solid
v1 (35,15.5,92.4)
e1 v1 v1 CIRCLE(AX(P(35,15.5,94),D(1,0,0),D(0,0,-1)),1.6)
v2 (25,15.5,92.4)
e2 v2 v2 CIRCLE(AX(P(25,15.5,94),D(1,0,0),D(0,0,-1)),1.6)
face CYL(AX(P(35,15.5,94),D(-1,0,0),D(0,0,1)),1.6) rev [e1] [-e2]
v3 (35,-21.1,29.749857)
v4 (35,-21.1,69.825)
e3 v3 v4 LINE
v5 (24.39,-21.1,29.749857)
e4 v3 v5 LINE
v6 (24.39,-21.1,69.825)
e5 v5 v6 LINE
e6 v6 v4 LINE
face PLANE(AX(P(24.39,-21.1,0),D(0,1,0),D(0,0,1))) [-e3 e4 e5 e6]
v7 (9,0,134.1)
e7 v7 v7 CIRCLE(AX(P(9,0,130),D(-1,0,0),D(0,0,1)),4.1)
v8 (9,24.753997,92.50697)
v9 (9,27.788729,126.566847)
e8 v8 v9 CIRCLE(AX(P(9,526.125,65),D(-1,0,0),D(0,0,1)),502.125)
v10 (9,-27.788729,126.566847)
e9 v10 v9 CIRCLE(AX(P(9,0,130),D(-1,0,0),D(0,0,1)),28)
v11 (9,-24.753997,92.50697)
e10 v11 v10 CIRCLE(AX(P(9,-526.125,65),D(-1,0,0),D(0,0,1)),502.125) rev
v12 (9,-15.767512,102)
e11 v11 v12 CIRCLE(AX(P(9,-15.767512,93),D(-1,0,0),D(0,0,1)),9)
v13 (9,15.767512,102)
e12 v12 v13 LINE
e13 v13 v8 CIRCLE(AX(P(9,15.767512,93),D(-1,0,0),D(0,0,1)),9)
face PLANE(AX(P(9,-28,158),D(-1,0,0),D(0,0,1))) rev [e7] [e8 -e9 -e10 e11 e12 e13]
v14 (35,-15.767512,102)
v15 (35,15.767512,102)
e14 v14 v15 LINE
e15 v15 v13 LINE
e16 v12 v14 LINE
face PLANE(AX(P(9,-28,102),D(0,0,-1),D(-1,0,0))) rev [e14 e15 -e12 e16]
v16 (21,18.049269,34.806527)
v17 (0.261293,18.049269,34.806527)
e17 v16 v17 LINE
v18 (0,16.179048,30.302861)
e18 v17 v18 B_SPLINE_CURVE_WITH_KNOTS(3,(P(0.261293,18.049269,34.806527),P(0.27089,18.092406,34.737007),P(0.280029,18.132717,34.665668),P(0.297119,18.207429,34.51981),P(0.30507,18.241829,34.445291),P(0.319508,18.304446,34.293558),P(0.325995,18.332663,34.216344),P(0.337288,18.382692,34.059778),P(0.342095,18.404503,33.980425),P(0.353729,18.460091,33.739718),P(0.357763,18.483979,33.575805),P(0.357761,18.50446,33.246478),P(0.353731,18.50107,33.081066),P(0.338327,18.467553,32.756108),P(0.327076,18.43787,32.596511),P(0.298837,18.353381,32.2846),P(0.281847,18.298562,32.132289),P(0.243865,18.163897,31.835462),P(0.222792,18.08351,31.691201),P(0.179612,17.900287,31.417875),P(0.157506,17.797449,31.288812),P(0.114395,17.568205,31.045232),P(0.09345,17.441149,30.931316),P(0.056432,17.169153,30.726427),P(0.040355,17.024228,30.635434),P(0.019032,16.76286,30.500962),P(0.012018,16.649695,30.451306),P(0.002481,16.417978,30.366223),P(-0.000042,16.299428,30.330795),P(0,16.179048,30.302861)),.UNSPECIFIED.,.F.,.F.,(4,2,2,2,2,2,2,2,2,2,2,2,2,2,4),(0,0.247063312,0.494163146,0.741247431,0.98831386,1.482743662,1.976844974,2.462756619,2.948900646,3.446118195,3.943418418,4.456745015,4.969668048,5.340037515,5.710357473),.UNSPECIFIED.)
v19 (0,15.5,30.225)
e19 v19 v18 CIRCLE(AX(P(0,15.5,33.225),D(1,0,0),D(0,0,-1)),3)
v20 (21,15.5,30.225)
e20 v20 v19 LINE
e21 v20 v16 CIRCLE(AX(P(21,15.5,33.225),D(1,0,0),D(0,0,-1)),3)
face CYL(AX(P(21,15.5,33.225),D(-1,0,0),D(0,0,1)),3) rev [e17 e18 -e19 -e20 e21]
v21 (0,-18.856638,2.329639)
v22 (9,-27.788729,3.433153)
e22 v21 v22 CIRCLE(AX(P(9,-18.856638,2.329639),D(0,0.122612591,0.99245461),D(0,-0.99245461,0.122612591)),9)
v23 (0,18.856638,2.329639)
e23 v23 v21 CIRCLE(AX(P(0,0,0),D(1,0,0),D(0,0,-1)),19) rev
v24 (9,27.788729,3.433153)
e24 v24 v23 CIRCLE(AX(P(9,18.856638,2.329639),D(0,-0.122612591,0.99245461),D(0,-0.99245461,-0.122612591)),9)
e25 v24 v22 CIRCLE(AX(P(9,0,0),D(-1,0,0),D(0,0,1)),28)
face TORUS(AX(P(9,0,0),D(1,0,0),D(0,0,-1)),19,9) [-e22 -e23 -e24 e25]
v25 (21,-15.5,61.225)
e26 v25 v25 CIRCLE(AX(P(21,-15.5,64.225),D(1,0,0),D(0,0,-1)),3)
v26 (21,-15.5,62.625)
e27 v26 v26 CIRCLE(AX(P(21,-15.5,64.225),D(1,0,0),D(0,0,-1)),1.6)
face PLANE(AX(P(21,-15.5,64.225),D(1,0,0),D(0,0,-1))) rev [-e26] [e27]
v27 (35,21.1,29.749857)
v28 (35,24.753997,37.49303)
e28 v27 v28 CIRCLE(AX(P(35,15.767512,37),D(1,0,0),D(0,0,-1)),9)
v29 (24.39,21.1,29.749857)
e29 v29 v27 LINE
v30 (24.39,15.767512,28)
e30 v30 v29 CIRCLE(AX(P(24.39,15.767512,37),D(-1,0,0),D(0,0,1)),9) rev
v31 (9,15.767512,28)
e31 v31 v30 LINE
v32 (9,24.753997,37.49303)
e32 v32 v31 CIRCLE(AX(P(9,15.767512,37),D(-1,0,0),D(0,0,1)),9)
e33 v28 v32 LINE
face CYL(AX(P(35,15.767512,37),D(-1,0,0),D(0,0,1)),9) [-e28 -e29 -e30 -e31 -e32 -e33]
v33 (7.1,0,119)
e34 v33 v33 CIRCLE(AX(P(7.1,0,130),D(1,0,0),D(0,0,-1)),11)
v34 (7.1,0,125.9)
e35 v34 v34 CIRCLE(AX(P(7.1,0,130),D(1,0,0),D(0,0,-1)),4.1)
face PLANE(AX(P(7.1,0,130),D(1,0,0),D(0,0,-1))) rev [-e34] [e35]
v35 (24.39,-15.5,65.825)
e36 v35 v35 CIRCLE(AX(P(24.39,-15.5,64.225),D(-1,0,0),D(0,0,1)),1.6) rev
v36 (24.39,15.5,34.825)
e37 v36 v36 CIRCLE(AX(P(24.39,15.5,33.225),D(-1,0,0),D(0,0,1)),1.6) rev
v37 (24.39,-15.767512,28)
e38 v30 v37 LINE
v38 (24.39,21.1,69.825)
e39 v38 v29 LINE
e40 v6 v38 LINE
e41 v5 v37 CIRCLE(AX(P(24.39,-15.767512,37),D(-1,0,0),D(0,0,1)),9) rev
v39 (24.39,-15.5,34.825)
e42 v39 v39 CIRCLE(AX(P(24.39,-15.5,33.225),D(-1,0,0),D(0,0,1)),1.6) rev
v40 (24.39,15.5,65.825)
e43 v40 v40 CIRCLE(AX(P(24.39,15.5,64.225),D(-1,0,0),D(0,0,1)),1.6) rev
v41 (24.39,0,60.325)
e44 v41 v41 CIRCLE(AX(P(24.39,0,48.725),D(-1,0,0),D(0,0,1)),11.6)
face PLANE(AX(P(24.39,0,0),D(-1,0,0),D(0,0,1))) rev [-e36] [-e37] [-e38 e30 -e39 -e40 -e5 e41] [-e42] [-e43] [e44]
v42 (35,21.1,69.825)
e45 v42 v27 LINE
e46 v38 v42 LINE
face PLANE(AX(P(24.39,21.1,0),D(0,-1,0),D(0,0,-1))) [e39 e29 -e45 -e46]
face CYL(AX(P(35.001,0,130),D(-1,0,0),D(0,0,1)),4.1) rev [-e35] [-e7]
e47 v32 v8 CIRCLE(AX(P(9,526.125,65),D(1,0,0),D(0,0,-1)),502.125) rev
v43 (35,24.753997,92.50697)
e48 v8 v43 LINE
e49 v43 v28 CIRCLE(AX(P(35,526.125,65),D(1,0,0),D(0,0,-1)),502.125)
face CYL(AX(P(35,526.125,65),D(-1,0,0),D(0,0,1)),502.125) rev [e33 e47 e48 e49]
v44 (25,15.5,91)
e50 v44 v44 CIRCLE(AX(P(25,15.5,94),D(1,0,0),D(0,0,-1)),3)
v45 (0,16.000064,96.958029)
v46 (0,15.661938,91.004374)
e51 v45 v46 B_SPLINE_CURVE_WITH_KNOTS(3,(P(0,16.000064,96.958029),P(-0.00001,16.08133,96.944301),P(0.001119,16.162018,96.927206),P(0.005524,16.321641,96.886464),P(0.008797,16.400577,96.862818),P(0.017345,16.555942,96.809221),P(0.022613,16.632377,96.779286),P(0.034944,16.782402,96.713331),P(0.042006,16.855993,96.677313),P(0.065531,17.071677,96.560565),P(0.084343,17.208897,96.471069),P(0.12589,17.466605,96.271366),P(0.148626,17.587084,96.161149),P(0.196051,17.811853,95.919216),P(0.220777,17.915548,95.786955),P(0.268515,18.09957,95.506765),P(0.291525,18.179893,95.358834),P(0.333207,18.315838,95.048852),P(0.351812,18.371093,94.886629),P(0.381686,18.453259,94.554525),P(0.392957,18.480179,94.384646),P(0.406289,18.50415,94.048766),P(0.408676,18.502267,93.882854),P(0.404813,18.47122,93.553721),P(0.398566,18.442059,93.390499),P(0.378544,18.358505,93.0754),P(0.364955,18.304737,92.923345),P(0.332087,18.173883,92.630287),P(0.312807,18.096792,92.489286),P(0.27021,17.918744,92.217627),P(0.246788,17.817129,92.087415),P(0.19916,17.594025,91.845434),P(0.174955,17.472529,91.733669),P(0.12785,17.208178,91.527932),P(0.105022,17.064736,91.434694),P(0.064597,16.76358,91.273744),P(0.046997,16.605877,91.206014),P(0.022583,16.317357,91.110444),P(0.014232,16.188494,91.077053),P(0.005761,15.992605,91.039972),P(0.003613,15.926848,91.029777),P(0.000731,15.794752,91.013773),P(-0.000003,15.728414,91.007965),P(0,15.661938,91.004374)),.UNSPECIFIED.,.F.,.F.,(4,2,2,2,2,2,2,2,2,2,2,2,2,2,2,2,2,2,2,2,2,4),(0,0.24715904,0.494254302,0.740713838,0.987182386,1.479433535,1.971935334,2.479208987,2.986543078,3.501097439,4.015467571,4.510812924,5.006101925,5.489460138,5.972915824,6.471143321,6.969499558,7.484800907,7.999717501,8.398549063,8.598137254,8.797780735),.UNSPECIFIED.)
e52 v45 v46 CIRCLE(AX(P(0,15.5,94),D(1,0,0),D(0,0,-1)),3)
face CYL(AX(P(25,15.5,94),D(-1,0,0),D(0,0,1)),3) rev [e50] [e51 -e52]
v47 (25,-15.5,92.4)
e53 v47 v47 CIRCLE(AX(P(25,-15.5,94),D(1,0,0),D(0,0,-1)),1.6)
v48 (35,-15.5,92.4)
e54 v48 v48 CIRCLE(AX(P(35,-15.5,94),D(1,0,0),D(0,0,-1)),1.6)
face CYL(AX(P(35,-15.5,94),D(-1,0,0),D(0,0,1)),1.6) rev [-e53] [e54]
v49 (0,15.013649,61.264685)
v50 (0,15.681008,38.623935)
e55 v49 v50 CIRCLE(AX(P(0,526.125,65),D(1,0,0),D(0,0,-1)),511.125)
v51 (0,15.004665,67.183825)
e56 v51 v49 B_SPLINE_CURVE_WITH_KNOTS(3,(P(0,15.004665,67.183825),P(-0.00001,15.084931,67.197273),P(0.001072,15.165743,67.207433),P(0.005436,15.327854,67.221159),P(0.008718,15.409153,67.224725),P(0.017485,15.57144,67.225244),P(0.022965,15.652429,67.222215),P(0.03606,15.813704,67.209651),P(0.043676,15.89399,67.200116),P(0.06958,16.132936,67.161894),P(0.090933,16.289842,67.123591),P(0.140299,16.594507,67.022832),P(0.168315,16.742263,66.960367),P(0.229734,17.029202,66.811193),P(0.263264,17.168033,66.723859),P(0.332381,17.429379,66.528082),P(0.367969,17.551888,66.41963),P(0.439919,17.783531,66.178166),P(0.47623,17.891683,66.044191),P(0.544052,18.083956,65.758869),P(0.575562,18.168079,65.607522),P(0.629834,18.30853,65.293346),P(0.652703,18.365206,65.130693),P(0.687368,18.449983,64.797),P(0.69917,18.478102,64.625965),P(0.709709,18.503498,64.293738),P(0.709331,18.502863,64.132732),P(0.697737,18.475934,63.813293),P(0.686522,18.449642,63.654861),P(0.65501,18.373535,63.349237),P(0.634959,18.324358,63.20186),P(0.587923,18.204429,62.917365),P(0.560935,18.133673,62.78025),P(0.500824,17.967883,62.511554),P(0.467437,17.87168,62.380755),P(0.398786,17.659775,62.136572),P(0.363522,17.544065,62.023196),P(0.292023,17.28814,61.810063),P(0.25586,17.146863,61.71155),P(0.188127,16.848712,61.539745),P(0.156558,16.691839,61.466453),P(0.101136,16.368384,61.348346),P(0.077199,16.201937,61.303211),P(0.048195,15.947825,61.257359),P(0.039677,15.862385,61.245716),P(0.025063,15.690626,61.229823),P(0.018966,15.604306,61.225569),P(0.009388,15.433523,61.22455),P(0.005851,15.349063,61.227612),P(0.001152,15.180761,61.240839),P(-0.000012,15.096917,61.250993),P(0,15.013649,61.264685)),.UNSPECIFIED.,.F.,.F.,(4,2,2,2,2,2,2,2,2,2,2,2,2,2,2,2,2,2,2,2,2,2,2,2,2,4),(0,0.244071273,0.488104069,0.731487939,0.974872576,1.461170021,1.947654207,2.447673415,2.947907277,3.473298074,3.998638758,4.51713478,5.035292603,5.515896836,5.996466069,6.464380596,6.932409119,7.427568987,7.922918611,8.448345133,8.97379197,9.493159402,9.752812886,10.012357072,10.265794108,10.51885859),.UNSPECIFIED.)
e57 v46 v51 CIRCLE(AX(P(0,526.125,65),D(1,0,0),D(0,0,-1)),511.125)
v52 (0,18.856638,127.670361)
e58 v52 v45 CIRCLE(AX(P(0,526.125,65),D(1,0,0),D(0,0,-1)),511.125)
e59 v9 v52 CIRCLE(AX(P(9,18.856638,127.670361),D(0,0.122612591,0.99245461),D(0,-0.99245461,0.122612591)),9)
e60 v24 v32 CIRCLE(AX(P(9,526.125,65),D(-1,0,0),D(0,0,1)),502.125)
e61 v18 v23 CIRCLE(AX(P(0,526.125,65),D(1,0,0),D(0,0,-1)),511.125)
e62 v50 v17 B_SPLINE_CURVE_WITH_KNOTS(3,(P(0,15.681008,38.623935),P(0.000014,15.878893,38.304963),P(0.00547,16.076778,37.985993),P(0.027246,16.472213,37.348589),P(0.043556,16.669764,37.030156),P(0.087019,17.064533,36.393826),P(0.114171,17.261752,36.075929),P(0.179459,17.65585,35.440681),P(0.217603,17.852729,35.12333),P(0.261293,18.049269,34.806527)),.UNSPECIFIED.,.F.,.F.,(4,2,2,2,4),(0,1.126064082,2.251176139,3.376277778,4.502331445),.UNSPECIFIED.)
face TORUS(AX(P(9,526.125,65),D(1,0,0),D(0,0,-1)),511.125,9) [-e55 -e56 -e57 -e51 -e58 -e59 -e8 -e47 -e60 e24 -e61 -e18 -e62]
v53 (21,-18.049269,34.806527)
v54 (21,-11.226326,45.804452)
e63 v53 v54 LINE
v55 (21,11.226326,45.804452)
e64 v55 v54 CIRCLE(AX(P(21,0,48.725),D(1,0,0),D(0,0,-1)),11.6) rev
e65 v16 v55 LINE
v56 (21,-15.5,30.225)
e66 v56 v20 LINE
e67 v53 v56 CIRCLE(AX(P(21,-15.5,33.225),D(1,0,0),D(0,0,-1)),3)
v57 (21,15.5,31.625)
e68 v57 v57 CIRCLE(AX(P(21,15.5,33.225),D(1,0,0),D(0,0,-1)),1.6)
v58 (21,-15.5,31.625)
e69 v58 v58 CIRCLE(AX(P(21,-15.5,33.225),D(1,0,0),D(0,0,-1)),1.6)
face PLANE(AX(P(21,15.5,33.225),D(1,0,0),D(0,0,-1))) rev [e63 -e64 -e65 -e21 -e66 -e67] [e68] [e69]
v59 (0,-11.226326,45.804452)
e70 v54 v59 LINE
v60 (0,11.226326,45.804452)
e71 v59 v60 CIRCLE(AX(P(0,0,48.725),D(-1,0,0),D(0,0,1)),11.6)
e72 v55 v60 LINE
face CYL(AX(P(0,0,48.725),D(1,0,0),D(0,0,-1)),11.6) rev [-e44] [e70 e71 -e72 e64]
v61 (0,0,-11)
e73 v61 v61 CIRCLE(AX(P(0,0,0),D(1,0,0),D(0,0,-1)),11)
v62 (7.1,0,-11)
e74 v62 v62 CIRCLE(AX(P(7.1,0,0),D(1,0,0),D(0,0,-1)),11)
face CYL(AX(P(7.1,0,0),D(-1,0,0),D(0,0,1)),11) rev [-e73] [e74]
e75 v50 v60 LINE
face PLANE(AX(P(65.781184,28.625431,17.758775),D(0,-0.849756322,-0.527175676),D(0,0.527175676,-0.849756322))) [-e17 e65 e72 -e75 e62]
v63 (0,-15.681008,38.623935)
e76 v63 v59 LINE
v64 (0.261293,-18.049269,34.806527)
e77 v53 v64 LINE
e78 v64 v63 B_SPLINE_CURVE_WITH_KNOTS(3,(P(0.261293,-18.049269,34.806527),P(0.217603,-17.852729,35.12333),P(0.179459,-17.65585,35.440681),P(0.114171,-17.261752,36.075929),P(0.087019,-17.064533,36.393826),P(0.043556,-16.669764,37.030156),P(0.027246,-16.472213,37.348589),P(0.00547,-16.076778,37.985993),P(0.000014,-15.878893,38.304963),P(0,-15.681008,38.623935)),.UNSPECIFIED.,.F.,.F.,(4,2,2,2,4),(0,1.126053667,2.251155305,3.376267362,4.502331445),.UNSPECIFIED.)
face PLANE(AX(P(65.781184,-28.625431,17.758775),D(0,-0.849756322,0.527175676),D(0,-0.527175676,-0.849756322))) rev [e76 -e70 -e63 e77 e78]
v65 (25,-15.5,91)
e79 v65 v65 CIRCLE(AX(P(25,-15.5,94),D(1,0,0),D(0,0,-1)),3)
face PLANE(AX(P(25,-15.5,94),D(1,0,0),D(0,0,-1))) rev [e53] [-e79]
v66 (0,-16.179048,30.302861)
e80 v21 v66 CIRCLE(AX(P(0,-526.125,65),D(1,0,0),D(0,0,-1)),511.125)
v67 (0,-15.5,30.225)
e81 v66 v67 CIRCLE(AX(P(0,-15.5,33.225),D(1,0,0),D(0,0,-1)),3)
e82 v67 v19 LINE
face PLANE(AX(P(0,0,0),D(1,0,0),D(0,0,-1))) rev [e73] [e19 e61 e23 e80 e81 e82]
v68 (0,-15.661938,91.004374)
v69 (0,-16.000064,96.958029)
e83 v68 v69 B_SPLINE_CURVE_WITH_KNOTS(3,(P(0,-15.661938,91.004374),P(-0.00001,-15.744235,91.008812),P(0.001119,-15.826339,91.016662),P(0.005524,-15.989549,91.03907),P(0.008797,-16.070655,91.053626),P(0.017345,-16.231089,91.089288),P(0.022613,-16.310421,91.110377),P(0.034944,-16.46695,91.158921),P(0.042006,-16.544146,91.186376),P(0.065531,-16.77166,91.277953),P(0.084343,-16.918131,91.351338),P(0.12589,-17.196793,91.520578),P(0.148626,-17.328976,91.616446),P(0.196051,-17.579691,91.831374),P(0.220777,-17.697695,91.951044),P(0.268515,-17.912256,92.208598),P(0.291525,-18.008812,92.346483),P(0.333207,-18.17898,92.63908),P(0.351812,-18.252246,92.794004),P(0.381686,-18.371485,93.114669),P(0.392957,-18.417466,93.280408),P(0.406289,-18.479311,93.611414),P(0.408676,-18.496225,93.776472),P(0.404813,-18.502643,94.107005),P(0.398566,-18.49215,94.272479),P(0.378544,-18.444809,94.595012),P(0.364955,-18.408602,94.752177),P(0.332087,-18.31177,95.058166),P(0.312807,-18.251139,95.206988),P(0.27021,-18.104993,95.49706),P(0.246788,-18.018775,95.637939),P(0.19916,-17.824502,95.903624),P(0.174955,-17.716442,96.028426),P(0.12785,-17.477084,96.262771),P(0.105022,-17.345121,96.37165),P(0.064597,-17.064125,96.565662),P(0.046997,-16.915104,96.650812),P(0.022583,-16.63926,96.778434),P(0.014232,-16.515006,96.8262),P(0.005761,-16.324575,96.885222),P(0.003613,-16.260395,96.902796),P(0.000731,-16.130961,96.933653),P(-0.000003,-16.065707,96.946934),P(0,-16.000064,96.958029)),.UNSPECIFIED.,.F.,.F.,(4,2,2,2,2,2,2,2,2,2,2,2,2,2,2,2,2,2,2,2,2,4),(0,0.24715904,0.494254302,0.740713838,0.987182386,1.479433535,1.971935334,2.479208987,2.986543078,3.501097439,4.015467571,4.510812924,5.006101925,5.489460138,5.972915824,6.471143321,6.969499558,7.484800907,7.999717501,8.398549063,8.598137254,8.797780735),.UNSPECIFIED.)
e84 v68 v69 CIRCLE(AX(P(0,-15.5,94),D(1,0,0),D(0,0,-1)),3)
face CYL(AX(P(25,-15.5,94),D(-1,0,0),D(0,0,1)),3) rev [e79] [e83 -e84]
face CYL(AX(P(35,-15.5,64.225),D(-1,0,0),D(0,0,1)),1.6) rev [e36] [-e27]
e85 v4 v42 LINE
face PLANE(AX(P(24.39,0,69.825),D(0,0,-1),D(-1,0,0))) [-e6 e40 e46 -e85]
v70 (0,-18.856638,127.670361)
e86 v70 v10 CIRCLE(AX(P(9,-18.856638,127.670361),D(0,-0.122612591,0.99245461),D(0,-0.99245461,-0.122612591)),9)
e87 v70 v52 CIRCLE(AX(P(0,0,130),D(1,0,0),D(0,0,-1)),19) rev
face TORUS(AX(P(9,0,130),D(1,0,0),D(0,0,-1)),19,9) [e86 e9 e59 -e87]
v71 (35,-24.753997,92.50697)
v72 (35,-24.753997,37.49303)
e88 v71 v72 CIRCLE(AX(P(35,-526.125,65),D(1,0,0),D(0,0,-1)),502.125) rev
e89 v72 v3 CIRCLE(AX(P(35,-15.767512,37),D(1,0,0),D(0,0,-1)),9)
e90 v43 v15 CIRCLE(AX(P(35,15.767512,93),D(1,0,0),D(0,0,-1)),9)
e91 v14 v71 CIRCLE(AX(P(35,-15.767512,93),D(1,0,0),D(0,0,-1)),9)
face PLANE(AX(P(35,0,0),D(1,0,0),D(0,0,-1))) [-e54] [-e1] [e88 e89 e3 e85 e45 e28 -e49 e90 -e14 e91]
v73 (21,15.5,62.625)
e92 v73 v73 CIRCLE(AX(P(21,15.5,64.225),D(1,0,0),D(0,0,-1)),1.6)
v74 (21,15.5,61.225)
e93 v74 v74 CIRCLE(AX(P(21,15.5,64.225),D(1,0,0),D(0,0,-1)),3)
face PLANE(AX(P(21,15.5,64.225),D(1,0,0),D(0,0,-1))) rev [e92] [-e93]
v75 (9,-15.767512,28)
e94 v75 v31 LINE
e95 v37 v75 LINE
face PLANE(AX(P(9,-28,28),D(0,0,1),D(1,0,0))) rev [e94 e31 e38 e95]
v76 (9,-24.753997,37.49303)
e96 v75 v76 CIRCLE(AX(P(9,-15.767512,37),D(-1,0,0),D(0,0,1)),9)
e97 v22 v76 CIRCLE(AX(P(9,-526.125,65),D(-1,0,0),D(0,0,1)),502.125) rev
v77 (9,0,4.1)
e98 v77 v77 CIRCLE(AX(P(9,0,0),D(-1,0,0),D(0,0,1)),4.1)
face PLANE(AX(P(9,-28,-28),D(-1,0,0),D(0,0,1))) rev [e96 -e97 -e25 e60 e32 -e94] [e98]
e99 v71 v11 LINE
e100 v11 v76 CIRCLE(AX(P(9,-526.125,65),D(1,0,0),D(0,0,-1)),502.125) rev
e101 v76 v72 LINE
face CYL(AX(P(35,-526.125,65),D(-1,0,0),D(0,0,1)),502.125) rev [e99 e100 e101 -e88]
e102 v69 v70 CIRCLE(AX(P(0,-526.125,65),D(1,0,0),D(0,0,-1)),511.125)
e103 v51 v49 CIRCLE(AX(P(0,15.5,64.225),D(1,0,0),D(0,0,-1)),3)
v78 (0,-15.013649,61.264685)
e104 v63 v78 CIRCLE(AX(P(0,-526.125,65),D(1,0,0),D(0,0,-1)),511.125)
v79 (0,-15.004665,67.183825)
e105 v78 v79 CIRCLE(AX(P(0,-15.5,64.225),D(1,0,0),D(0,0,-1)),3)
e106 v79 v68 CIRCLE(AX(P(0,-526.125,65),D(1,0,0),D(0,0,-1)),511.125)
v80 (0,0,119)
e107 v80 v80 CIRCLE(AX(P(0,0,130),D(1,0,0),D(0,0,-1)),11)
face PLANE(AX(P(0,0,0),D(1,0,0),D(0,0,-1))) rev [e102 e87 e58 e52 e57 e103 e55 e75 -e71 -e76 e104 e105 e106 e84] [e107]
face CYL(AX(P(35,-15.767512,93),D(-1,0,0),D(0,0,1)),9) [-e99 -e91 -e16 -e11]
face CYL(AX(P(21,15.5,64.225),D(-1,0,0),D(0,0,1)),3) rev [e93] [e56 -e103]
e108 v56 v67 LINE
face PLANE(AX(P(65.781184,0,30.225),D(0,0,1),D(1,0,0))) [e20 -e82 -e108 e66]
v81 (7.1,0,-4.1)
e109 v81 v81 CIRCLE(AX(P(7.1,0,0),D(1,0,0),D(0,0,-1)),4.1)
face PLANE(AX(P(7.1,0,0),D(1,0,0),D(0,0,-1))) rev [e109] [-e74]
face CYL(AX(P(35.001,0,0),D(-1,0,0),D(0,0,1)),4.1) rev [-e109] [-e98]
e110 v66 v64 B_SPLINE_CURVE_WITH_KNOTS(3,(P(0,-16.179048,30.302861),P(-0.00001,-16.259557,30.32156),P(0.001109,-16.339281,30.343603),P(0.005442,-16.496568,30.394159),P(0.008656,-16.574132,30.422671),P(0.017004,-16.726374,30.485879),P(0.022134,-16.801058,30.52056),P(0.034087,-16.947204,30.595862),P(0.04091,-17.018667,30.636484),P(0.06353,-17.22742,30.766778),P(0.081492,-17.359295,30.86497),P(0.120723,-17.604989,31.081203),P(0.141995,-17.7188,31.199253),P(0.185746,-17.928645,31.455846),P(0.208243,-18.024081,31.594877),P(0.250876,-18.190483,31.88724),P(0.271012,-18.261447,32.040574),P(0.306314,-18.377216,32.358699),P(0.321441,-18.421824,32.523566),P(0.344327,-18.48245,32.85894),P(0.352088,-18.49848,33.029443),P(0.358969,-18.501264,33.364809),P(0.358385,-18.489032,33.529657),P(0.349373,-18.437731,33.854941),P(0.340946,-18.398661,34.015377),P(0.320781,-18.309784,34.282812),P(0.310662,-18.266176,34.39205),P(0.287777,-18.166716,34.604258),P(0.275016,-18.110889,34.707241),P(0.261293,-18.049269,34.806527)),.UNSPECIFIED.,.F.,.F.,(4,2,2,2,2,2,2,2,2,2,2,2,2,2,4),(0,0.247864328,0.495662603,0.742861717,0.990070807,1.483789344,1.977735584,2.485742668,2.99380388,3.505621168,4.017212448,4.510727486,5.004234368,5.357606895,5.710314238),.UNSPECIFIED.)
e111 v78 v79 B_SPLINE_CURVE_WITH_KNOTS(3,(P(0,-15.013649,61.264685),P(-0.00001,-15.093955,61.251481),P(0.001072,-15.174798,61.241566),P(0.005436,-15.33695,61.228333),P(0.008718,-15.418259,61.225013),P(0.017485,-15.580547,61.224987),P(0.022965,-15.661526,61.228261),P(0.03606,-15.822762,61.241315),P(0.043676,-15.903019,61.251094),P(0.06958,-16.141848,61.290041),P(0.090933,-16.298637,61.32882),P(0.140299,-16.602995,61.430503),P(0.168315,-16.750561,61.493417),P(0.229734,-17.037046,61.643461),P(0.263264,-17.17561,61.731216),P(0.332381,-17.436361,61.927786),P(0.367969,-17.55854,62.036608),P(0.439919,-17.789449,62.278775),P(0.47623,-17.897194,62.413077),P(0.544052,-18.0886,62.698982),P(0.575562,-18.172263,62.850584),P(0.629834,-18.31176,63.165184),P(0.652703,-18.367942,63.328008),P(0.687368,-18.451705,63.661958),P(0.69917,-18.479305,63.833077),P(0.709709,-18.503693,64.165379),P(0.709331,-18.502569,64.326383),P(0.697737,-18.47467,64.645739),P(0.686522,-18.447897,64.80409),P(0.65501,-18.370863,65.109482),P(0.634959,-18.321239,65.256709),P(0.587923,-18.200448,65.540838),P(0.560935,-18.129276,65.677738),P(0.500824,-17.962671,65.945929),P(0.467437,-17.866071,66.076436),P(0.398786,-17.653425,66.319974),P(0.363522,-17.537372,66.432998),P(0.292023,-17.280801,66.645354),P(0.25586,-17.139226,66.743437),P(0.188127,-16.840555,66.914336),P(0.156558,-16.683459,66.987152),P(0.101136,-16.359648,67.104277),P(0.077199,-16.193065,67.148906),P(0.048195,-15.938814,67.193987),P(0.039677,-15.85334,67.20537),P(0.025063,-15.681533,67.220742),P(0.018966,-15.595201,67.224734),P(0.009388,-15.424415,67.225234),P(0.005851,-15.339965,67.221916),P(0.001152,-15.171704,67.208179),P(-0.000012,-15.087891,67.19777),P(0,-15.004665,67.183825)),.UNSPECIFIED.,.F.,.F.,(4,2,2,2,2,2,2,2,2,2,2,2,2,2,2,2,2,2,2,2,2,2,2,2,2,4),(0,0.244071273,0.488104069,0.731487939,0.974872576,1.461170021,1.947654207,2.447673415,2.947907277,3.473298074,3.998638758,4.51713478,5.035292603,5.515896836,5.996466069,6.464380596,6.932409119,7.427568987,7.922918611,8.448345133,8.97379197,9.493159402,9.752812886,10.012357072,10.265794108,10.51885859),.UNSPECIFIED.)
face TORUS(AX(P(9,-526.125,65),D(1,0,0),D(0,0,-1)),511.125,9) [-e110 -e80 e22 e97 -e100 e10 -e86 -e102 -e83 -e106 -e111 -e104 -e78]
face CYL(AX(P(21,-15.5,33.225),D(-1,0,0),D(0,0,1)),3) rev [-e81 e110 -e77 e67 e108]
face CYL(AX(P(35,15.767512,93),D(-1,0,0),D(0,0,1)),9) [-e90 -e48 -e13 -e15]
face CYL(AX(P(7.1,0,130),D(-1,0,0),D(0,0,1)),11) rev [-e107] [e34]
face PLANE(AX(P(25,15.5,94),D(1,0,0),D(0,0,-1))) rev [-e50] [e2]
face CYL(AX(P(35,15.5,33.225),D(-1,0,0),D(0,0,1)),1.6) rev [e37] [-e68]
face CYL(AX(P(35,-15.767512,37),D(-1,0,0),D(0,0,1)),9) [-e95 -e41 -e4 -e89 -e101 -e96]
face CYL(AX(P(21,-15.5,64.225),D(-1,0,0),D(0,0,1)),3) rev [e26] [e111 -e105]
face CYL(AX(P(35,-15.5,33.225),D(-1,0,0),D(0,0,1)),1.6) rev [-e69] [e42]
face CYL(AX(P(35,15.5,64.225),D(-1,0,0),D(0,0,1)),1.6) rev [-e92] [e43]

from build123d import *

# Parameters (mm, degrees)
BOSS_EXTRUDE1_DEPTH     = 35
CUT_EXTRUDE1_DEPTH      = 165.23458831805192
CUT_EXTRUDE1_DEPTH_BACK = 165.23458831805192
CUT_EXTRUDE2_START      = 35
CUT_EXTRUDE2_DEPTH      = 10.61
SKETCH5_R               = 1.600000000000005
SKETCH5_R_2             = 1.6000000000000056
CUT_EXTRUDE3_DEPTH      = 165.23458831805192
SKETCH5_3_R             = 3.0000000000000004
SKETCH5_3_R_2           = 3.0000000000000013
CUT_EXTRUDE4_DEPTH      = 21
SKETCH8_R               = 1.600000000000005
SKETCH8_R_2             = 1.6000000000000056
CUT_EXTRUDE5_DEPTH      = 165.23458831805192
SKETCH8_3_R             = 3.000000000000008
CUT_EXTRUDE6_DEPTH      = 25
CUT_EXTRUDE7_REACH      = 166.235
SKETCH7_R               = 4.1
SKETCH7_R_2             = 4.099999999999986
SKETCH7_3_R             = 11
SKETCH7_3_R_2           = 10.999999999999993
CUT_EXTRUDE8_DEPTH      = 7.1
CUT_EXTRUDE9_DEPTH      = 21
CUT_EXTRUDE11_START     = 24.39
SKETCH11_R              = 11.6
CUT_EXTRUDE11_DEPTH     = 189.6245883180519
FILLET3_R               = 9
FILLET4_R               = 9


with BuildPart() as part:
    # Sketch1 → Boss-Extrude1 (new body)
    with BuildSketch(Plane(origin=(0, 0, 0), x_dir=(0, 0, -1), z_dir=(1, 0, 0))):
        with BuildLine():
            ThreePointArc((-3.4331525583588727, 27.788729073331762), (-20.97770568525129, 18.545507924642443), (-28, 3.43e-15))
            Line((-28, 0), (28, 0))
            ThreePointArc((28, 0), (18.545507924642447, 20.977705685251287), (-3.4331525583588727, 27.788729073331762))
        make_face()
        with BuildLine():
            Line((28, 0), (-28, 0))
            ThreePointArc((-28, 3.43e-15), (-20.977705685251298, -18.545507924642436), (-3.433152558358892, -27.78872907333176))
            ThreePointArc((-3.433152558358892, -27.78872907333176), (18.545507924642436, -20.977705685251298), (28, -6.86e-15))
        make_face()
        with BuildLine():
            ThreePointArc((-126.56684744164114, 27.788729073331766), (-109.02229431474872, 18.54550792464245), (-102, 0))
            Line((-102, 0), (-28, 0))
            ThreePointArc((-28, 3.43e-15), (-20.97770568525129, 18.545507924642443), (-3.4331525583588727, 27.788729073331762))
            ThreePointArc((-3.433152558358863, 27.788729073331695), (-65, 23.999999999999602), (-126.56684744164116, 27.788729073331638))
        make_face()
        with BuildLine():
            Line((-28, 0), (-102, 0))
            ThreePointArc((-102, -6.86e-15), (-109.0222943147487, -18.545507924642447), (-126.56684744164114, -27.788729073331766))
            ThreePointArc((-126.56684744164116, -27.788729073331638), (-65, -23.999999999999602), (-3.433152558358863, -27.788729073331695))
            ThreePointArc((-3.433152558358892, -27.78872907333176), (-20.977705685251298, -18.545507924642436), (-28, 3.43e-15))
        make_face()
        with BuildLine():
            ThreePointArc((-126.56684744164114, 27.788729073331766), (-148.54550792464244, 20.977705685251287), (-158, 3.43e-15))
            Line((-158, 0), (-102, 0))
            ThreePointArc((-102, 0), (-109.02229431474872, 18.54550792464245), (-126.56684744164114, 27.788729073331766))
        make_face()
        with BuildLine():
            Line((-102, 0), (-158, 0))
            ThreePointArc((-158, 3.43e-15), (-148.54550792464244, -20.97770568525128), (-126.56684744164114, -27.788729073331766))
            ThreePointArc((-126.56684744164114, -27.788729073331766), (-109.0222943147487, -18.545507924642447), (-102, -6.86e-15))
        make_face()
    extrude(amount=BOSS_EXTRUDE1_DEPTH)

    # Sketch4 → Cut-Extrude1 (cut, two sides: drawn at the far end of the back side and taken through both)
    with BuildSketch(Plane(origin=(0, 0, 0), x_dir=(1, 0, 0), z_dir=(0, 1, 0)).offset(-CUT_EXTRUDE1_DEPTH_BACK)):
        Polygon((8.999999999999998, 27.999999999999996), (61, 27.999999999999996), (61, -28.000000000000004), (9.000000000000005, -28.000000000000004), align=None)
        Polygon((60.999999999999986, -157.99999999999997), (60.99999999999993, -101.99999999999999), (8.999999999999956, -101.99999999999999), (8.99999999999997, -157.99999999999997), align=None)
    extrude(amount=CUT_EXTRUDE1_DEPTH + CUT_EXTRUDE1_DEPTH_BACK, mode=Mode.SUBTRACT)

    # Sketch6 → Cut-Extrude2 (cut)
    with BuildSketch(Plane(origin=(0, 0, 0), x_dir=(0, 0, -1), z_dir=(1, 0, 0)).offset(CUT_EXTRUDE2_START)):
        Polygon((-27.624999999999996, -21.1), (-69.825, -21.100000000000005), (-69.825, 21.099999999999994), (-27.624999999999996, 21.1), align=None)
    extrude(amount=-CUT_EXTRUDE2_DEPTH, mode=Mode.SUBTRACT)

    # Sketch5 → Cut-Extrude3 (cut, through all)
    with BuildSketch(Plane(origin=(0, 0, 0), x_dir=(0, 0, -1), z_dir=(1, 0, 0))):
        with Locations(Location((-33.225, -15.5, 0), (0, 0, 180))):
            Circle(SKETCH5_R)
        with Locations(Location((-33.225, 15.5, 0), (0, 0, 180))):
            Circle(SKETCH5_R)
        with Locations(Location((-64.22500000000001, -15.500000000000004, 0), (0, 0, 180))):
            Circle(SKETCH5_R)
        with Locations(Location((-64.22500000000001, 15.499999999999995, 0), (0, 0, 180))):
            Circle(SKETCH5_R_2)
    extrude(amount=CUT_EXTRUDE3_DEPTH, mode=Mode.SUBTRACT)

    # Sketch5<3> → Cut-Extrude4 (cut)
    with BuildSketch(Plane(origin=(0, 0, 0), x_dir=(0, 0, -1), z_dir=(1, 0, 0))):
        with Locations(Location((-33.225, -15.5, 0), (0, 0, 180))):
            Circle(SKETCH5_3_R)
        with Locations(Location((-33.225, 15.5, 0), (0, 0, 180))):
            Circle(SKETCH5_3_R)
        with Locations(Location((-64.22500000000001, -15.500000000000004, 0), (0, 0, 180))):
            Circle(SKETCH5_3_R_2)
        with Locations(Location((-64.22500000000001, 15.499999999999995, 0), (0, 0, 180))):
            Circle(SKETCH5_3_R_2)
    extrude(amount=CUT_EXTRUDE4_DEPTH, mode=Mode.SUBTRACT)

    # Sketch8 → Cut-Extrude5 (cut, through all)
    with BuildSketch(Plane(origin=(0, 0, 0), x_dir=(0, 0, -1), z_dir=(1, 0, 0))):
        with Locations((-94, -15.500000000000012)):
            Circle(SKETCH8_R)
        with Locations((-94, 15.499999999999988)):
            Circle(SKETCH8_R_2)
    extrude(amount=CUT_EXTRUDE5_DEPTH, mode=Mode.SUBTRACT)

    # Sketch8<3> → Cut-Extrude6 (cut)
    with BuildSketch(Plane(origin=(0, 0, 0), x_dir=(0, 0, -1), z_dir=(1, 0, 0))):
        with Locations((-94, -15.500000000000012)):
            Circle(SKETCH8_3_R)
        with Locations((-94, 15.499999999999988)):
            Circle(SKETCH8_3_R)
    extrude(amount=CUT_EXTRUDE6_DEPTH, mode=Mode.SUBTRACT)

    # Sketch7 → Cut-Extrude7 (cut, up to next)
    with BuildSketch(Plane(origin=(0, 0, 0), x_dir=(0, 0, -1), z_dir=(1, 0, 0)), mode=Mode.PRIVATE) as cut_extrude7_sk1:
        with Locations(Location((0, 0, 0), (0, 0, 180))):
            Circle(SKETCH7_R)
    cut_extrude7_tool1 = extrude(cut_extrude7_sk1.sketch, amount=CUT_EXTRUDE7_REACH, mode=Mode.PRIVATE) & part.part
    # Sketch7 → Cut-Extrude7 (cut, up to next)
    with BuildSketch(Plane(origin=(0, 0, 0), x_dir=(0, 0, -1), z_dir=(1, 0, 0)), mode=Mode.PRIVATE) as cut_extrude7_sk2:
        with Locations(Location((-130, 0, 0), (0, 0, 180))):
            Circle(SKETCH7_R_2)
    cut_extrude7_tool2 = extrude(cut_extrude7_sk2.sketch, amount=CUT_EXTRUDE7_REACH, mode=Mode.PRIVATE) & part.part
    add(cut_extrude7_tool1.solids().sort_by_distance((0, 0, 0))[0], mode=Mode.SUBTRACT)
    add(cut_extrude7_tool2.solids().sort_by_distance((0, 0, 130))[0], mode=Mode.SUBTRACT)

    # Sketch7<3> → Cut-Extrude8 (cut)
    with BuildSketch(Plane(origin=(0, 0, 0), x_dir=(0, 0, -1), z_dir=(1, 0, 0))):
        Circle(SKETCH7_3_R)
        with Locations((-130, 0)):
            Circle(SKETCH7_3_R_2)
    extrude(amount=CUT_EXTRUDE8_DEPTH, mode=Mode.SUBTRACT)

    # Sketch9 → Cut-Extrude9 (cut)
    with BuildSketch(Plane(origin=(0, 0, 0), x_dir=(0, 0, -1), z_dir=(1, 0, 0))):
        with BuildLine():
            Line((-52.942405411719506, -6.7980505730098315), (-34.806527029394815, -18.04926896487869))
            ThreePointArc((-34.80652702939481, -18.049268964878678), (-34.68366701337481, -12.878494603459266), (-30.22500000000001, -15.5))
            Line((-30.225000000000005, -15.5), (-30.225000000000005, 15.5))
            ThreePointArc((-30.225, 15.5), (-34.68366701337481, 12.878494603459261), (-34.806527029394815, 18.04926896487868))
            Line((-34.806527029394815, 18.04926896487869), (-52.942405411719506, 6.7980505730098315))
            ThreePointArc((-52.9424054117195, 6.7980505730098155), (-56.725, 9.8e-16), (-52.9424054117195, -6.798050573009815))
        make_face()
    extrude(amount=CUT_EXTRUDE9_DEPTH, mode=Mode.SUBTRACT)

    # Sketch11 → Cut-Extrude11 (cut, through all)
    with BuildSketch(Plane(origin=(0, 0, 0), x_dir=(0, 0, -1), z_dir=(1, 0, 0)).offset(CUT_EXTRUDE11_START)):
        with Locations(Location((-48.725, 0, 0), (0, 0, 75.417643506))):
            Circle(SKETCH11_R)
    extrude(amount=-CUT_EXTRUDE11_DEPTH, mode=Mode.SUBTRACT)

    # Fillet3
    # the kernel refuses this fillet: 9 mm, written as the material it takes off along each edge
    with BuildSketch(Plane(origin=(0, -7.11e-15, 130), x_dir=(0, 0.9924546097618487, -0.12261259136995861), z_dir=(0, -0.12261259136995861, -0.9924546097618487))) as fillet3_piece_1:
        with BuildLine():
            CenterArc((28 - FILLET3_R, FILLET3_R), FILLET3_R, 270, 89.99999999999999)
            Line((28, FILLET3_R), (28, 0))
            Line((28, 0), (28 - FILLET3_R, 0))
        make_face()
    revolve(axis=Axis((0, -7.11e-15, 130), (1, 0, 0)), revolution_arc=194.0858135076888, mode=Mode.SUBTRACT)
    with BuildSketch(Plane(origin=(0, -526.1249999999588, 65.00000000000026), x_dir=(0, 0.9924546097618475, 0.12261259136996942), z_dir=(0, -0.12261259136996942, 0.9924546097618475))) as fillet3_piece_2:
        with BuildLine():
            CenterArc((502.1249999999593 + FILLET3_R, -FILLET3_R), FILLET3_R, 90, 90)
            Line((502.1249999999593 + FILLET3_R, 1.78e-15), (502.1249999999593, 0))
            Line((502.1249999999593, 0), (502.1249999999593, -FILLET3_R))
        make_face()
    revolve(axis=Axis((0, -526.1249999999588, 65.00000000000026), (-1, 0, 0)), revolution_arc=14.085813507690109, mode=Mode.SUBTRACT)
    with BuildSketch(Plane(origin=(0, 1.78e-15, -1.78e-15), x_dir=(0, -0.9924546097618486, 0.12261259136995943), z_dir=(0, 0.12261259136995943, 0.9924546097618486))) as fillet3_piece_3:
        with BuildLine():
            CenterArc((27.999999999999993 - FILLET3_R, FILLET3_R), FILLET3_R, 270, 89.99999999999999)
            Line((27.999999999999993, FILLET3_R), (27.999999999999993, 0))
            Line((27.999999999999993, 0), (27.999999999999993 - FILLET3_R, 0))
        make_face()
    revolve(axis=Axis((0, 1.78e-15, -1.78e-15), (1, 0, 0)), revolution_arc=194.0858135076889, mode=Mode.SUBTRACT)
    with BuildSketch(Plane(origin=(0, 526.1249999999663, 65.00000000000024), x_dir=(0, -0.9924546097618476, -0.12261259136996856), z_dir=(0, 0.12261259136996856, -0.9924546097618476))) as fillet3_piece_4:
        with BuildLine():
            CenterArc((502.1249999999667 + FILLET3_R, -FILLET3_R), FILLET3_R, 90, 90)
            Line((502.1249999999667 + FILLET3_R, 1.78e-15), (502.1249999999667, 0))
            Line((502.1249999999667, 0), (502.1249999999667, -FILLET3_R))
        make_face()
    revolve(axis=Axis((0, 526.1249999999663, 65.00000000000024), (-1, 0, 0)), revolution_arc=14.085813507689899, mode=Mode.SUBTRACT)

    # Fillet4
    fillet4_edges = [part.edges().sort_by_distance(p)[0] for p in [
        (22.000000000000004, -25.365061880944552, 28),
        (21.99999999999998, -25.365061880944495, 101.99999999999999),
        (21.99999999999998, 25.365061880944552, 101.99999999999999),
        (22.000000000000004, 25.36506188094461, 28),
    ]]
    fillet(fillet4_edges, radius=FILLET4_R)


solid = part.part
